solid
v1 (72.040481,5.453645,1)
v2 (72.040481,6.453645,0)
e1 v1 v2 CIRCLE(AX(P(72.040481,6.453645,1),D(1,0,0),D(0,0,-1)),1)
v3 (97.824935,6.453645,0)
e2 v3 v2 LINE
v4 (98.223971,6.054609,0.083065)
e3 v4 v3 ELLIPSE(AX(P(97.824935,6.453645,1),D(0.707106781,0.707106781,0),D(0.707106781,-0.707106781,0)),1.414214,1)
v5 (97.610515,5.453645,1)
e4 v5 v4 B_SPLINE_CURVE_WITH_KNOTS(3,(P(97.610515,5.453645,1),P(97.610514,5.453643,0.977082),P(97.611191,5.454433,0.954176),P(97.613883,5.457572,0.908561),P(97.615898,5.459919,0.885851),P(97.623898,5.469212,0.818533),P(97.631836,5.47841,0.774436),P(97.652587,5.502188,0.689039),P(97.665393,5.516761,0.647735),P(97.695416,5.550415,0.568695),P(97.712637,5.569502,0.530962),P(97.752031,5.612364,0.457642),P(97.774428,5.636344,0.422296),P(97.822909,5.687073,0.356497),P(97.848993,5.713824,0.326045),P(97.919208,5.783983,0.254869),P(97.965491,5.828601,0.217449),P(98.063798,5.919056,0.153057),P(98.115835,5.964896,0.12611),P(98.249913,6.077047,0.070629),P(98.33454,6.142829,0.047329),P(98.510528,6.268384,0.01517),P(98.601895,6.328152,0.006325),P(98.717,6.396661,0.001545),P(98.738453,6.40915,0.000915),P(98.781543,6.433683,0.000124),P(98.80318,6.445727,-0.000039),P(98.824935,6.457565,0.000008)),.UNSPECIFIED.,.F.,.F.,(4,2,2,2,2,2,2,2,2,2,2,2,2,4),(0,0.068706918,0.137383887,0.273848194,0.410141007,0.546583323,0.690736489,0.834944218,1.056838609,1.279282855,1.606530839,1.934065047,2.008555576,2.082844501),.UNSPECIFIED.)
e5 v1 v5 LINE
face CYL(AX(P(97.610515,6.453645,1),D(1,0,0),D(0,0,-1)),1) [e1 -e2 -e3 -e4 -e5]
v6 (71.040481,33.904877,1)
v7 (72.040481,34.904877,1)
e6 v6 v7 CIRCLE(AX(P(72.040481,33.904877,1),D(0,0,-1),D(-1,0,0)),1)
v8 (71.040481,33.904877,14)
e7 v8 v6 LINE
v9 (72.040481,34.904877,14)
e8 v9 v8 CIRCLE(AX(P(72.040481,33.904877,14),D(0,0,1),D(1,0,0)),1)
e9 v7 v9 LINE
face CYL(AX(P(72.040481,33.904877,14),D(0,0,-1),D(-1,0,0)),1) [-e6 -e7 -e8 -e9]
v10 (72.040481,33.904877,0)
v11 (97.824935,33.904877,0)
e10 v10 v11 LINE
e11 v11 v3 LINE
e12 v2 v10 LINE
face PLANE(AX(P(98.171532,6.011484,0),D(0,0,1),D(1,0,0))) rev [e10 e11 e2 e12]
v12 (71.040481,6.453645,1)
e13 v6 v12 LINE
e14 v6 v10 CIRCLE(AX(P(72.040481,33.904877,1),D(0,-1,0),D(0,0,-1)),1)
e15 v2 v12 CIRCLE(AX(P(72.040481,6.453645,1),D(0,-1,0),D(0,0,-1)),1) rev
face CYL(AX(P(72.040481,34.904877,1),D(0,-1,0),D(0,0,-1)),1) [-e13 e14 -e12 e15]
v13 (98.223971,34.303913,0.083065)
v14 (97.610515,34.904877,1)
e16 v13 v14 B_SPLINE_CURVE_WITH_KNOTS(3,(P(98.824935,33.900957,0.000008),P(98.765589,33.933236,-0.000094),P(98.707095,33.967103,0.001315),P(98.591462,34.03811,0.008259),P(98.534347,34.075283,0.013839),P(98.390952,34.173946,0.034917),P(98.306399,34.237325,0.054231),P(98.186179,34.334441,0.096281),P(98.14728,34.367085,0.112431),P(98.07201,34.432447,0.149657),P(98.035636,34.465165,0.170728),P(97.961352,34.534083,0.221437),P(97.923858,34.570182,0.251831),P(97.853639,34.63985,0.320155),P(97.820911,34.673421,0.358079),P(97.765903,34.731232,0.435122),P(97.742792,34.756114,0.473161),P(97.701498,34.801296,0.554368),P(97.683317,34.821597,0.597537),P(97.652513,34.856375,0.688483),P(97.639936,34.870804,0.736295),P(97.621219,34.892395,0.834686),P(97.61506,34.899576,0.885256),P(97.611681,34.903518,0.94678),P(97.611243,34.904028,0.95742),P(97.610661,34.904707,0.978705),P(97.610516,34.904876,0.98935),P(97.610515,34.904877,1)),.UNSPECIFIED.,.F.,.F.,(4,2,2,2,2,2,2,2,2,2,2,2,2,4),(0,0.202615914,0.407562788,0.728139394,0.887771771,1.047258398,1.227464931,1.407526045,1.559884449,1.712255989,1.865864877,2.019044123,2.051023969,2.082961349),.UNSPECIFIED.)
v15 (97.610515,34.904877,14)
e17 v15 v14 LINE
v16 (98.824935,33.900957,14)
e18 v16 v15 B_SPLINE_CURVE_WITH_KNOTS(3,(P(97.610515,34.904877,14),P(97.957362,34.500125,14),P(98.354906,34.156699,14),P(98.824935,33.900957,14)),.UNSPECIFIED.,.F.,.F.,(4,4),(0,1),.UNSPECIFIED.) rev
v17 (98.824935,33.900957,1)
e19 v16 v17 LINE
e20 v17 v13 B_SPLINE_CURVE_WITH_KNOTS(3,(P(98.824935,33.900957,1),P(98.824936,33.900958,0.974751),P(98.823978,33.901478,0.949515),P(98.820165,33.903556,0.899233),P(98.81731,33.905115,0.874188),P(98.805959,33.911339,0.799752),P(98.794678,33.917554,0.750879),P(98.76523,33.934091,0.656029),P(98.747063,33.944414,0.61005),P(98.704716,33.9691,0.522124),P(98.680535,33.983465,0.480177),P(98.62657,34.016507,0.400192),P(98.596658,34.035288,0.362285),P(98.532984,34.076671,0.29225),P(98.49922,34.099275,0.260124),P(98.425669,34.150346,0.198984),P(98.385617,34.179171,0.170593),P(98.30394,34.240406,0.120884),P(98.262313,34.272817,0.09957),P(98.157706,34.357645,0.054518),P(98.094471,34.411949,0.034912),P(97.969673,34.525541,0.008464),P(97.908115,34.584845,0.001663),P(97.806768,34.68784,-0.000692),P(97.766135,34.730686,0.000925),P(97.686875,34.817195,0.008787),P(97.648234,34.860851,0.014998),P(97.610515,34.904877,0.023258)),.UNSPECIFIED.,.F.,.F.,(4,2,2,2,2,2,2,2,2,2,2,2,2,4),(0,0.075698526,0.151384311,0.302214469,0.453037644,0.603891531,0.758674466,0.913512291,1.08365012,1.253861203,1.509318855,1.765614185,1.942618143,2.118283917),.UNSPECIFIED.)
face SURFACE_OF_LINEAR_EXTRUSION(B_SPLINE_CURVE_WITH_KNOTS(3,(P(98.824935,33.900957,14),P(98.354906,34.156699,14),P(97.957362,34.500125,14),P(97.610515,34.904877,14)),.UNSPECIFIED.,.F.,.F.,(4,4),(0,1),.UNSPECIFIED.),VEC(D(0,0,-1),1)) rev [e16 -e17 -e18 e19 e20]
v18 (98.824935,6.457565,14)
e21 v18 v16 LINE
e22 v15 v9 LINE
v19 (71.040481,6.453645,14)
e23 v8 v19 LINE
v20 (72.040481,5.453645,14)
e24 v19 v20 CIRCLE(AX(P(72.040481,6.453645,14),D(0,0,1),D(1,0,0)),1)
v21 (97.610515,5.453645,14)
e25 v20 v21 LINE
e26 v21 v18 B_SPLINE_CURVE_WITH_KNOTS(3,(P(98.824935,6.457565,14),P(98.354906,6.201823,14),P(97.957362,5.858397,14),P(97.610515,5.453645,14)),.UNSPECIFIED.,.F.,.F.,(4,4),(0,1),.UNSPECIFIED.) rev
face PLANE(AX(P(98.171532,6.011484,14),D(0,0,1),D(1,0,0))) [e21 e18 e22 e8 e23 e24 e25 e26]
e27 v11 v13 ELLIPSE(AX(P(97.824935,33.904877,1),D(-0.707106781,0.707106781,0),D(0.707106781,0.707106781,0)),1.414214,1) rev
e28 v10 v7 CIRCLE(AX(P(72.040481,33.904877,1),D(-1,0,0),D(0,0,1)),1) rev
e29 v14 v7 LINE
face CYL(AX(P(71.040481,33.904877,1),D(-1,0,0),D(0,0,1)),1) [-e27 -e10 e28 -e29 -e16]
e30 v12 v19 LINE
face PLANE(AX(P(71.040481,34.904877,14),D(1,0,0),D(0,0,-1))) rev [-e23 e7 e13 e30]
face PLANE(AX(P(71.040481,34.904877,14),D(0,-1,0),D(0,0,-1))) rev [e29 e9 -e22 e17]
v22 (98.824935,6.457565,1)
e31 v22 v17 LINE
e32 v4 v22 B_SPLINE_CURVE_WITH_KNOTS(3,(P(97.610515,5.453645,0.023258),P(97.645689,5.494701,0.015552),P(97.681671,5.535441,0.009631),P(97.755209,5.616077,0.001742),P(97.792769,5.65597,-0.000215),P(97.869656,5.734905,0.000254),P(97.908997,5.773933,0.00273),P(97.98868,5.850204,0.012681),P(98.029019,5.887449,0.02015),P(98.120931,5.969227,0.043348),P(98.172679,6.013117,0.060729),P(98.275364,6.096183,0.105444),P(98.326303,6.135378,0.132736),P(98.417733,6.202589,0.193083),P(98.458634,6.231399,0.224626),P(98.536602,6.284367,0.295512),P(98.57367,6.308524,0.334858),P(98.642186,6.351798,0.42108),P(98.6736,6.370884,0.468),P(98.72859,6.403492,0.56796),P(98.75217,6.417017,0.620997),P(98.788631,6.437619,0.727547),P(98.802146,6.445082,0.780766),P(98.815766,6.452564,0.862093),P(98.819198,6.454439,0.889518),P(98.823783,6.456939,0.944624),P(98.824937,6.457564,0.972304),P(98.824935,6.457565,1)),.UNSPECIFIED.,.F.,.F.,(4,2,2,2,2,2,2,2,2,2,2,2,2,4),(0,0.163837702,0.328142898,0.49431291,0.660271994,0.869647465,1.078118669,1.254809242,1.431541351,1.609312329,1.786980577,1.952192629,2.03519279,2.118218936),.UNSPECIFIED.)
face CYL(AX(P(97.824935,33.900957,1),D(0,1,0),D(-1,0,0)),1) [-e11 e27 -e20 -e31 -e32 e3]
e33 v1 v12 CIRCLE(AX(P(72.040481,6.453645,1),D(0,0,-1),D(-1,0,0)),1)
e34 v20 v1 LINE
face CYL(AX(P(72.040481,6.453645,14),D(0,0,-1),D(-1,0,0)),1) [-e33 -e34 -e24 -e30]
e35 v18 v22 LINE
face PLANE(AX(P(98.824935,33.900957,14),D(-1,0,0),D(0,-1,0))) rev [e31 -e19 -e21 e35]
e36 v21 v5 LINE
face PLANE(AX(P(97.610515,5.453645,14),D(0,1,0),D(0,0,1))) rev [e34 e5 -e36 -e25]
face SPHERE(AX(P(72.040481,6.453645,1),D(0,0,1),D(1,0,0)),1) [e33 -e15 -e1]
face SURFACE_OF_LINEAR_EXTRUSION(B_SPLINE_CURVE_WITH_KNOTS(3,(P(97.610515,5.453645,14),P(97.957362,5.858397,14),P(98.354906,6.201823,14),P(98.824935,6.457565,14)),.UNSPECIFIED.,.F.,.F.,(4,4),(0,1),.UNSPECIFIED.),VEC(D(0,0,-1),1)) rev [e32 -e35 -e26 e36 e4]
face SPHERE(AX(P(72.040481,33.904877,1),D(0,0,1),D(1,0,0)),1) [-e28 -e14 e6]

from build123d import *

# Parameters (mm, degrees)
BOSS_EXTRUDE1_DEPTH = 14
FILLET1_R           = 1
FILLET2_R           = 1


with BuildPart() as part:
    # Sketch1 → Boss-Extrude1 (new body)
    with BuildSketch(Plane.XY):
        with BuildLine():
            Line((71.040481499, 34.904877363), (71.040481499, 5.453644912))
            Line((71.040481499, 5.453644912), (97.610515081, 5.453644912))
            add(Edge.make_bspline(
                [(97.610515081, 5.453644912), (97.957362424, 5.858397077), (98.354905943, 6.201823205), (98.824935041, 6.457565141)],
                knots=[0, 0, 0, 0, 1, 1, 1, 1], degree=3))
            Line((98.824935041, 6.457565141), (98.824935041, 33.900957115))
            add(Edge.make_bspline(
                [(98.824935041, 33.900957115), (98.354905942, 34.156699053), (97.957362434, 34.5001252), (97.610515091, 34.904877363)],
                knots=[0, 0, 0, 0, 1, 1, 1, 1], degree=3))
            Line((97.610515091, 34.904877363), (71.040481499, 34.904877363))
        make_face()
    extrude(amount=BOSS_EXTRUDE1_DEPTH)

    # Fillet1
    # the kernel refuses this fillet: 1 mm, written as the material it takes off along each edge
    with BuildSketch(Plane(origin=(98.824935041, 3.957565141, 0), x_dir=(0, 0, 1), z_dir=(0, 1, 0))) as fillet1_piece_1:
        with BuildLine():
            CenterArc((FILLET1_R, -FILLET1_R), FILLET1_R, 90, 90)
            Line((0, -FILLET1_R), (0, 0))
            Line((0, 0), (FILLET1_R, 0))
        make_face()
    extrude(amount=32.443391974, mode=Mode.SUBTRACT)
    with BuildSketch(Plane(origin=(68.540481499, 5.453644912, 0), x_dir=(0, 0, 1), z_dir=(1, 0, 0))) as fillet1_piece_2:
        with BuildLine():
            CenterArc((FILLET1_R, -FILLET1_R), FILLET1_R, 90, 90)
            Line((0, -FILLET1_R), (0, 0))
            Line((0, 0), (FILLET1_R, 0))
        make_face()
    extrude(amount=31.570033582, mode=Mode.SUBTRACT)
    with BuildSketch(Plane(origin=(71.040481499, 37.404877363, 0), x_dir=(0, 0, 1), z_dir=(0, -1, 0))) as fillet1_piece_3:
        with BuildLine():
            CenterArc((FILLET1_R, -FILLET1_R), FILLET1_R, 90, 90)
            Line((0, -FILLET1_R), (0, 0))
            Line((0, 0), (FILLET1_R, 0))
        make_face()
    extrude(amount=34.45123245, mode=Mode.SUBTRACT)
    with BuildSketch(Plane(origin=(100.110515091, 34.904877363, 0), x_dir=(0, 0, 1), z_dir=(-1, 0, 0))) as fillet1_piece_4:
        with BuildLine():
            CenterArc((FILLET1_R, -FILLET1_R), FILLET1_R, 90, 90)
            Line((0, -FILLET1_R), (0, 0))
            Line((0, 0), (FILLET1_R, 0))
        make_face()
    extrude(amount=31.570033592, mode=Mode.SUBTRACT)

    # Fillet2
    # the kernel refuses this fillet: 1 mm, written as the material it takes off along each edge
    with BuildSketch(Plane(origin=(72.040481499, 33.904877363, 1), x_dir=(0, 1, 0), z_dir=(-1, 0, 0))) as fillet2_piece_1_section:
        Polygon((0, 0), (FILLET2_R, 0), (FILLET2_R, FILLET2_R), (0, FILLET2_R), align=None)
    fillet2_piece_1 = extrude(amount=FILLET2_R, mode=Mode.PRIVATE)
    fillet2_piece_1 = fillet2_piece_1 - Plane(origin=(72.040481499, 33.904877363, 1), x_dir=(0, -0.7071067811865475, 0.7071067811865475), z_dir=(-1, 0, 0)) * Sphere(FILLET2_R, mode=Mode.PRIVATE)
    add(fillet2_piece_1, mode=Mode.SUBTRACT)
    with BuildSketch(Plane(origin=(72.040481499, 6.453644912, 1), x_dir=(0, -1, 0), z_dir=(-1, 0, 0))) as fillet2_piece_2_section:
        Polygon((0, 0), (FILLET2_R, 0), (FILLET2_R, -FILLET2_R), (0, -FILLET2_R), align=None)
    fillet2_piece_2 = extrude(amount=FILLET2_R, mode=Mode.PRIVATE)
    fillet2_piece_2 = fillet2_piece_2 - Plane(origin=(72.040481499, 6.453644912, 1), x_dir=(0, 0.7071067811865475, 0.7071067811865475), z_dir=(-1, 0, 0)) * Sphere(FILLET2_R, mode=Mode.PRIVATE)
    add(fillet2_piece_2, mode=Mode.SUBTRACT)
    with BuildSketch(Plane(origin=(71.040481499, 34.904877363, 1), x_dir=(0, -1, 0), z_dir=(0, 0, 1))) as fillet2_piece_3:
        with BuildLine():
            CenterArc((FILLET2_R, FILLET2_R), FILLET2_R, 180, 90)
            Line((0, FILLET2_R), (0, 0))
            Line((0, 0), (FILLET2_R, 0))
        make_face()
    extrude(amount=15.5, mode=Mode.SUBTRACT)
    with BuildSketch(Plane(origin=(71.040481499, 5.453644912, 1), x_dir=(0, 1, 0), z_dir=(0, 0, 1))) as fillet2_piece_4:
        with BuildLine():
            CenterArc((FILLET2_R, -FILLET2_R), FILLET2_R, 90, 90)
            Line((0, -FILLET2_R), (0, 0))
            Line((0, 0), (FILLET2_R, 0))
        make_face()
    extrude(amount=15.5, mode=Mode.SUBTRACT)


solid = part.part
